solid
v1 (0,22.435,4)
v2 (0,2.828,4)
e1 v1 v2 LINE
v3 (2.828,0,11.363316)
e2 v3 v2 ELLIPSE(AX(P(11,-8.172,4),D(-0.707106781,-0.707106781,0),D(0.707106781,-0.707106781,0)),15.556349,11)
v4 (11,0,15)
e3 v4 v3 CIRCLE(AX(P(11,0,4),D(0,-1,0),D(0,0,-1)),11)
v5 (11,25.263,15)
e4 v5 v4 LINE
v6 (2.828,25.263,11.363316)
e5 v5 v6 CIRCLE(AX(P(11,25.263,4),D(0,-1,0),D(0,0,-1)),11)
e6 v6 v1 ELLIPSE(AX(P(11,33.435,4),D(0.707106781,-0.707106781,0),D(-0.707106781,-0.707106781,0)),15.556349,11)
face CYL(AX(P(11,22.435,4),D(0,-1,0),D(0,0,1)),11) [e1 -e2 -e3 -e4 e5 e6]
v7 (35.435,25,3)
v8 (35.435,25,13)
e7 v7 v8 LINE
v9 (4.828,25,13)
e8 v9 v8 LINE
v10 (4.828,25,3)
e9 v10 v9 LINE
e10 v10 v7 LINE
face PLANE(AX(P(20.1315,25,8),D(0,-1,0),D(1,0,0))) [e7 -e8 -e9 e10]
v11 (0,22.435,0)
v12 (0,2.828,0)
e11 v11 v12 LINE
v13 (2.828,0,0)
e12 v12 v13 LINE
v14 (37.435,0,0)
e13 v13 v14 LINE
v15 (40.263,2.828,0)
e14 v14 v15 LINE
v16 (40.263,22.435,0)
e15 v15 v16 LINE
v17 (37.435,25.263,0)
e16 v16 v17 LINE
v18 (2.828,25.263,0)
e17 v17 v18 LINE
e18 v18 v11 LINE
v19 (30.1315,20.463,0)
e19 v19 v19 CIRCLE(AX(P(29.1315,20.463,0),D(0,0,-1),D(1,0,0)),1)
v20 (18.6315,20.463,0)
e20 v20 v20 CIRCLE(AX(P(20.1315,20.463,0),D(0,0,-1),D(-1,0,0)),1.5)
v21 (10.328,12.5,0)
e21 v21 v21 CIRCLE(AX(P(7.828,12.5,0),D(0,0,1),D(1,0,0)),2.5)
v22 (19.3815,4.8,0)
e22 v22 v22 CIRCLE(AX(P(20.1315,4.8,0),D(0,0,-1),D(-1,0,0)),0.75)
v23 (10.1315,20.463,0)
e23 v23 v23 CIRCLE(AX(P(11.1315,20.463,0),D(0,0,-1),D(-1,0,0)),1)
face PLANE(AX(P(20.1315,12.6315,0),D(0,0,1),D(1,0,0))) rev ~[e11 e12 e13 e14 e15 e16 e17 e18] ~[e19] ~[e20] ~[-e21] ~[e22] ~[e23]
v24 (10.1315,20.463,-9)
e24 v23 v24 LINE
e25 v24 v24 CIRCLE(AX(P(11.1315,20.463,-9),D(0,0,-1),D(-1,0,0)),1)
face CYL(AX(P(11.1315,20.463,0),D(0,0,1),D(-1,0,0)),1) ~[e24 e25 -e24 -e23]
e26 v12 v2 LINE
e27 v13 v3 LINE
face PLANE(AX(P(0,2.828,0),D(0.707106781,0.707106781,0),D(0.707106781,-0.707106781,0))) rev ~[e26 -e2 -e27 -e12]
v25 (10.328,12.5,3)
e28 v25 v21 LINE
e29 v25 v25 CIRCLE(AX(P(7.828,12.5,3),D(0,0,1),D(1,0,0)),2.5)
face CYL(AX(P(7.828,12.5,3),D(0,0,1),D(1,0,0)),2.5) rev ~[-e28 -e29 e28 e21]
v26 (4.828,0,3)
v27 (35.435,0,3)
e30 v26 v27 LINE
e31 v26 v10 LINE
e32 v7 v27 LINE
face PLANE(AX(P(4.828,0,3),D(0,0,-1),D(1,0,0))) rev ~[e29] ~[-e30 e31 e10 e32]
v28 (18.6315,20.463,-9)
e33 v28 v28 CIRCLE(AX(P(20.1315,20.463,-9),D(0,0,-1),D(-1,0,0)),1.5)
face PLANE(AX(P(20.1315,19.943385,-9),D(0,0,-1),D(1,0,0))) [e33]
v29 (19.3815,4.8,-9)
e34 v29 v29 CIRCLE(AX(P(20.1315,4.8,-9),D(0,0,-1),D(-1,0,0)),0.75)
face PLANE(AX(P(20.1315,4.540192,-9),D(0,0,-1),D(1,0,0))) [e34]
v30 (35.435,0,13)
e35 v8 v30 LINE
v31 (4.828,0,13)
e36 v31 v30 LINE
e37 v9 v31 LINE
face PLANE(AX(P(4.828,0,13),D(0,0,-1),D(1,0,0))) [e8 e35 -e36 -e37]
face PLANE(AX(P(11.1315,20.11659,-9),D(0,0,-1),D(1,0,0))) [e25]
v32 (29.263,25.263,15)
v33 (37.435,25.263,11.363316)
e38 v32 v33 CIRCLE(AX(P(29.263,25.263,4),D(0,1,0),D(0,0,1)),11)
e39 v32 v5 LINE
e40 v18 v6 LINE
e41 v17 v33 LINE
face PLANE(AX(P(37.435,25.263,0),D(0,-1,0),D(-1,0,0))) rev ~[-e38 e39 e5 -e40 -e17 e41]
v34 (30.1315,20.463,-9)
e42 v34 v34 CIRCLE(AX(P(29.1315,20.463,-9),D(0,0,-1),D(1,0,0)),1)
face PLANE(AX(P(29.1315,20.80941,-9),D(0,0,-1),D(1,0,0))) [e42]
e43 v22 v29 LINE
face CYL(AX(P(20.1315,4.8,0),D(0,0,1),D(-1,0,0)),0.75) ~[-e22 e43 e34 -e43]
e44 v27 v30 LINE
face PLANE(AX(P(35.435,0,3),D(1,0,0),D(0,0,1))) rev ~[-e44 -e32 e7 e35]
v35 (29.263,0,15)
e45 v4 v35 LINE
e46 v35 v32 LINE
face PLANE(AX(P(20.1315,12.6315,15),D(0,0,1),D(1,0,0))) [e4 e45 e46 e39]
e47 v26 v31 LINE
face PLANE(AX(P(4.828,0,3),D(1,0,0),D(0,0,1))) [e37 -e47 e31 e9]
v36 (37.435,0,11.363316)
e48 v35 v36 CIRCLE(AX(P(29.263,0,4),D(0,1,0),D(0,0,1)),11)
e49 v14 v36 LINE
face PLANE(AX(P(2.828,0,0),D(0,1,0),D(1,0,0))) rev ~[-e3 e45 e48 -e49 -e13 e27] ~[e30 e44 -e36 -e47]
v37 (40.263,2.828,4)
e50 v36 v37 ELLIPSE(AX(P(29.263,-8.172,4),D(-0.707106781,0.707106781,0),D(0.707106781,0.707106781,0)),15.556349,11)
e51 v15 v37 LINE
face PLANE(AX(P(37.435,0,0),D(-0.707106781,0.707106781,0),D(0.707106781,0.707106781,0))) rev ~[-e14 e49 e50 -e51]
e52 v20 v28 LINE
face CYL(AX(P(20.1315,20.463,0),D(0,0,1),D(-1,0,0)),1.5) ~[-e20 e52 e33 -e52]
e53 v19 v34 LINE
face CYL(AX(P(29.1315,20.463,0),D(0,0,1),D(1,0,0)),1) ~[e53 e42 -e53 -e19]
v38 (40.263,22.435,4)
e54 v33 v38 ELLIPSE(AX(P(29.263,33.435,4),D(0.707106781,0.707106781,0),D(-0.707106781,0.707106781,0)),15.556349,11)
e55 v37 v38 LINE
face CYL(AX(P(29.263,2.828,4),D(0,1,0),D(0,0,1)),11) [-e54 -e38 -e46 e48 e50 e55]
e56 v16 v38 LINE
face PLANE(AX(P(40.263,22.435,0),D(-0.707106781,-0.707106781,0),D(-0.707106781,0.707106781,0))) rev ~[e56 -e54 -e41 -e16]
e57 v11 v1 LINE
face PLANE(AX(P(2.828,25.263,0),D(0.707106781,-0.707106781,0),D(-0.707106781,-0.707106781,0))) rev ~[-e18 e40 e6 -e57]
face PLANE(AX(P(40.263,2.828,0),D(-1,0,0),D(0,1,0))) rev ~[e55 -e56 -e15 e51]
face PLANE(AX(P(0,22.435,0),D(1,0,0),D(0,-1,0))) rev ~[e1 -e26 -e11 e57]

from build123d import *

# Parameters (mm, degrees)
F1_DEPTH  = 15
F2_W      = 30.607
F2_H      = 10
F3_DEPTH  = 25
F4_DEPTH  = 20
F6_DEPTH  = 9
F7_DEPTH  = 9
F8_R      = 11
F9_R      = 2.5
F10_DEPTH = 25


# Not quite as in the source:
# - a feature names something its author has since deleted; it is built from what else it names


with BuildPart() as f1:
    # F0 (on Top) → F1 (new body)
    with BuildSketch(Plane.XY):
        Polygon((37.435, 25.263), (2.828, 25.263), (0, 22.435), (0, 2.828), (2.828, 0), (37.435, 0), (40.263, 2.828), (40.263, 22.435), align=None)
    extrude(amount=F1_DEPTH)

    # F2 (on face) → F3 (cut)
    with BuildSketch(Plane.XZ):
        with Locations((20.1315, 8)):
            Rectangle(F2_W, F2_H)
    extrude(amount=-F3_DEPTH, mode=Mode.SUBTRACT)

    # F2 (on face) → F4 (cut)
    with BuildSketch(Plane.XZ):
        with Locations((20.1315, 8)):
            Rectangle(F2_W, F2_H)
    extrude(amount=-F4_DEPTH, mode=Mode.SUBTRACT)

    # F5 (on face) → F6 (join)
    with BuildSketch(Plane(origin=(0, 0, 0), x_dir=(1, 0, 0), z_dir=(0, 0, -1))):
        with BuildLine():
            ThreePointArc((12.1315, -20.463), (11.1315, -19.463), (10.1315, -20.463))
            Line((10.1315, -20.463), (12.1315, -20.463))
        make_face()
        with BuildLine():
            Line((12.1315, -20.463), (10.1315, -20.463))
            ThreePointArc((10.1315, -20.463), (11.1315, -21.463), (12.1315, -20.463))
        make_face()
        with BuildLine():
            Line((18.6315, -20.463), (21.6315, -20.463))
            ThreePointArc((21.6315, -20.463), (20.1315, -18.963), (18.6315, -20.463))
        make_face()
        with BuildLine():
            ThreePointArc((18.6315, -20.463), (20.1315, -21.963), (21.6315, -20.463))
            Line((21.6315, -20.463), (18.6315, -20.463))
        make_face()
        with BuildLine():
            ThreePointArc((28.1315, -20.463), (29.1315, -21.463), (30.1315, -20.463))
            Line((30.1315, -20.463), (28.1315, -20.463))
        make_face()
        with BuildLine():
            Line((28.1315, -20.463), (30.1315, -20.463))
            ThreePointArc((30.1315, -20.463), (29.1315, -19.463), (28.1315, -20.463))
        make_face()
    extrude(amount=F6_DEPTH)

    # F5 (on face) → F7 (join)
    with BuildSketch(Plane(origin=(0, 0, 0), x_dir=(1, 0, 0), z_dir=(0, 0, -1))):
        with BuildLine():
            Line((19.3815, -4.8), (20.8815, -4.8))
            ThreePointArc((20.8815, -4.8), (20.1315, -4.05), (19.3815, -4.8))
        make_face()
        with BuildLine():
            ThreePointArc((19.3815, -4.8), (20.1315, -5.55), (20.8815, -4.8))
            Line((20.8815, -4.8), (19.3815, -4.8))
        make_face()
    extrude(amount=F7_DEPTH)

    # F8
    f8_edges = [f1.edges().sort_by_distance(p)[0] for p in [
        (40.263, 12.6315, 15),
        (0, 12.6315, 15),
    ]]
    fillet(f8_edges, radius=F8_R)

    # F9 (on face) → F10 (cut)
    with BuildSketch(Plane.XY.offset(3)):
        with Locations((7.828, 12.5)):
            Circle(F9_R)
    extrude(amount=-F10_DEPTH, mode=Mode.SUBTRACT)


solid = f1.part
